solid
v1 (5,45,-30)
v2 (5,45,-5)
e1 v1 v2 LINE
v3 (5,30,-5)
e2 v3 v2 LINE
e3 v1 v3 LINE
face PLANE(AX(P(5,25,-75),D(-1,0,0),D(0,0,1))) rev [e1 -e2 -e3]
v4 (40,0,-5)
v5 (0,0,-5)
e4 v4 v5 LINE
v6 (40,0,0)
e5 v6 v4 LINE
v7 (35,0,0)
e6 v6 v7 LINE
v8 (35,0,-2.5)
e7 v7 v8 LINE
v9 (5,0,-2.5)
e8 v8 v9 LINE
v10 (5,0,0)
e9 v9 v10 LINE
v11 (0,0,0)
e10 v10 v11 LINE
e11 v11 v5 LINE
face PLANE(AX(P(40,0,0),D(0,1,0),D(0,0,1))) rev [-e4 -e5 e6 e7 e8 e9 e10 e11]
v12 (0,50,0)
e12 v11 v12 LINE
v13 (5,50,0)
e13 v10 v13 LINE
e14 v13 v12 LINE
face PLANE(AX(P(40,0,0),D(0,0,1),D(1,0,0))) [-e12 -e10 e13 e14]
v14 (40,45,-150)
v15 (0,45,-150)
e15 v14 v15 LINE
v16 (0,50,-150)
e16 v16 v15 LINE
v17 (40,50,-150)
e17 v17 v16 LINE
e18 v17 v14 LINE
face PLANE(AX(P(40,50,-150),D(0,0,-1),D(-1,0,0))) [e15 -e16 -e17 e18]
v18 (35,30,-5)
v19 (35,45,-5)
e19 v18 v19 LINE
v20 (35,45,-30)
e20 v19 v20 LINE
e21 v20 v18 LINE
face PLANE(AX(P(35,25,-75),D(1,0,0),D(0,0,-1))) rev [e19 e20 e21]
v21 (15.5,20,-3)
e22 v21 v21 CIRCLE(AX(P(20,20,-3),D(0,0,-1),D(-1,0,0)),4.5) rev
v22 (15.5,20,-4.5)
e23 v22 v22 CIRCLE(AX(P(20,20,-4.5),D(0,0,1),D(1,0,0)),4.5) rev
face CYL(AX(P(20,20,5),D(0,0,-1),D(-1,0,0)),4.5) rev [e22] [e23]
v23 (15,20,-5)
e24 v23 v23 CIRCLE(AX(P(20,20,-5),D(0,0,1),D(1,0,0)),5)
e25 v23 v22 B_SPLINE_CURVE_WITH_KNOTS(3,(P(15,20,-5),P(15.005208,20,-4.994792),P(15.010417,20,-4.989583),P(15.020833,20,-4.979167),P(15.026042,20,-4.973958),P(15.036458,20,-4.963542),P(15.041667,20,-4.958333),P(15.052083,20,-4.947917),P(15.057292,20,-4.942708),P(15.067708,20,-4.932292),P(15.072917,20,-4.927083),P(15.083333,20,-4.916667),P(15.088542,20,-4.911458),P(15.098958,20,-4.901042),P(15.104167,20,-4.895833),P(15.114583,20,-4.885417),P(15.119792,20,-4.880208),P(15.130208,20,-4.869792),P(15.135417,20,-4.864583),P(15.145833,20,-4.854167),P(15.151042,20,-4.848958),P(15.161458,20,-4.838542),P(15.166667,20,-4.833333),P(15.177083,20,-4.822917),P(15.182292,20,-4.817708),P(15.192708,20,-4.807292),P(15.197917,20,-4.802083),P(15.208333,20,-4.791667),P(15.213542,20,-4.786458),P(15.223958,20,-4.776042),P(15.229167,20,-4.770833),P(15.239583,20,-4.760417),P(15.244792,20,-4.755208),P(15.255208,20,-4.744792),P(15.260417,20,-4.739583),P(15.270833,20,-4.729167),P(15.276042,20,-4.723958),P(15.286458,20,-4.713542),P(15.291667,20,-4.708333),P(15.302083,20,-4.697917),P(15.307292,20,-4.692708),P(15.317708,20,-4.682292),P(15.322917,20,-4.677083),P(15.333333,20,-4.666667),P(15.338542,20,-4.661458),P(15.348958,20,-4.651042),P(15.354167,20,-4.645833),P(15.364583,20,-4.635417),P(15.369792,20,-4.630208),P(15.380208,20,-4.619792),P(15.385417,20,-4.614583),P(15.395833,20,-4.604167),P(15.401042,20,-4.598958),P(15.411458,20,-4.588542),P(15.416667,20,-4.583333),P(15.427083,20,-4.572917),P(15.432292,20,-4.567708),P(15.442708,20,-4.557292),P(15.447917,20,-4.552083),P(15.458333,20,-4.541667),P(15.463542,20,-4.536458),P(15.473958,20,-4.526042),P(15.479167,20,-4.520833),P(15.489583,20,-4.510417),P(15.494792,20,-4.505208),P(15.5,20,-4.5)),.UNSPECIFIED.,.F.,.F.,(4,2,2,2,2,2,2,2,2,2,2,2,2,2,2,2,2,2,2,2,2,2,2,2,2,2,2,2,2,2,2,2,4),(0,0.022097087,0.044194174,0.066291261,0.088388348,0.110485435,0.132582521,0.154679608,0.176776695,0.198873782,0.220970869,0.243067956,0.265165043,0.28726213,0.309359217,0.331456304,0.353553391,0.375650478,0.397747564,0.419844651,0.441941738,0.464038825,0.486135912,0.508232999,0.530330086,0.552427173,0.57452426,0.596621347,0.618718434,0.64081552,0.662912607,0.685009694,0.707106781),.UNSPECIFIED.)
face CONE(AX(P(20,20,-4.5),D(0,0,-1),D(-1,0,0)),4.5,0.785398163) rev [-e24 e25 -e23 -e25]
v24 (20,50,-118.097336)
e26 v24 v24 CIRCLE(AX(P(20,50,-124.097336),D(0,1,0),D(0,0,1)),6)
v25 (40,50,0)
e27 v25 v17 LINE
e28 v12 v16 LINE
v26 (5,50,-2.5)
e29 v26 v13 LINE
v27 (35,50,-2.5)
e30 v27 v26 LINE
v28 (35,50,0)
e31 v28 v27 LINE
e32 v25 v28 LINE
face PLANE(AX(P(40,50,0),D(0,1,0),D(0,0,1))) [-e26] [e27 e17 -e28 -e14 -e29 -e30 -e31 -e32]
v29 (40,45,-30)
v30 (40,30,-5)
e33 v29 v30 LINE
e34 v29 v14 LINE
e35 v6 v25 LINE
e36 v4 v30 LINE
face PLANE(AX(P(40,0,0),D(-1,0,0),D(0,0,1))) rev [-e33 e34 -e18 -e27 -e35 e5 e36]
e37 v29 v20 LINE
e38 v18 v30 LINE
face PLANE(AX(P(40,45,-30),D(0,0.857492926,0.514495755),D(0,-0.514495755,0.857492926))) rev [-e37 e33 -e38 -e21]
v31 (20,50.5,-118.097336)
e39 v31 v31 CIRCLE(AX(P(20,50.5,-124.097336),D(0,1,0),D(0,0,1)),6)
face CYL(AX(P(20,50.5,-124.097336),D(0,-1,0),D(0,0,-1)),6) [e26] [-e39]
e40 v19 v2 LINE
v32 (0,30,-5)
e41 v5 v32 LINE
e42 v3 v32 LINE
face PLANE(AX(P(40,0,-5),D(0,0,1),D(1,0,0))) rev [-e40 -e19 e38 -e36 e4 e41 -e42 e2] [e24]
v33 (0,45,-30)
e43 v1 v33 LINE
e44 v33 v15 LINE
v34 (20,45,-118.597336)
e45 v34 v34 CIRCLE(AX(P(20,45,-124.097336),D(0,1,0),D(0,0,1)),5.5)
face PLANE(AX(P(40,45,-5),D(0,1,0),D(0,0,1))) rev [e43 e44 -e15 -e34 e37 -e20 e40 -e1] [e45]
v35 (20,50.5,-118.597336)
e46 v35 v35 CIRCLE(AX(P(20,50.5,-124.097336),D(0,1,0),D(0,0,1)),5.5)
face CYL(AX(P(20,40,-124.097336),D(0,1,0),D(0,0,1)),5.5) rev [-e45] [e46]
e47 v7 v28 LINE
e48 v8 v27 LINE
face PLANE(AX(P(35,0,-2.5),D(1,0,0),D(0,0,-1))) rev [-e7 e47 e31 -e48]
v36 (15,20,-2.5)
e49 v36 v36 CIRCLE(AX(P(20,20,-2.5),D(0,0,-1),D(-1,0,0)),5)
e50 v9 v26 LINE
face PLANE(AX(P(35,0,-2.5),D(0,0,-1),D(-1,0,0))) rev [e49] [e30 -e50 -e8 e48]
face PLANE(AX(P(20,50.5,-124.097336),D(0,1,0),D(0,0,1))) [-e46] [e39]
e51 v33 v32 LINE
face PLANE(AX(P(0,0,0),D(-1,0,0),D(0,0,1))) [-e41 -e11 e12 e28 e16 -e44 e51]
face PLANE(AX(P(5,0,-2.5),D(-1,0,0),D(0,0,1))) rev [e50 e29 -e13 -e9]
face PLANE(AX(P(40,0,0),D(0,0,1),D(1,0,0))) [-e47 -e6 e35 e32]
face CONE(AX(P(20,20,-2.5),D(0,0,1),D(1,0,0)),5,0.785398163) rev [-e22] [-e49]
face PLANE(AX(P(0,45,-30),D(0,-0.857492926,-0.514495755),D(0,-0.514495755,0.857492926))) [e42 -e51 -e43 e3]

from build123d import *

# Parameters (mm, degrees)
DODANIE_WYCI_GNI_CIE1_DEPTH = 40
SZKIC2_W                    = 30
SZKIC2_H                    = 2.5
WYTNIJ_WYCI_GNI_CIE1_DEPTH  = 164.095064303
EBRO3_START                 = -5
EBRO3_DEPTH                 = 5
SZKIC4_R                    = 4.5
WYTNIJ_WYCI_GNI_CIE2_DEPTH  = 10
SFAZOWANIE1_SIZE            = 0.5
WYTNIJ_WYCI_GNI_CIE3_DEPTH  = 10
DODANIE_WYCI_GNI_CIE2_START = 0.5
SZKIC6_R                    = 6
SZKIC6_R_2                  = 5.5
DODANIE_WYCI_GNI_CIE2_DEPTH = 0.5


# Read off the part's stored shape, not the designer's step: Żebro3
with BuildPart() as part:
    # Szkic1 → Dodanie-wyciągnięcie1 (new body)
    with BuildSketch(Plane(origin=(0, 0, 0), x_dir=(0, 0, -1), z_dir=(1, 0, 0))):
        Polygon((0, 0), (0, 50), (150, 50), (150, 45), (5, 45), (5, 0), align=None)
    extrude(amount=DODANIE_WYCI_GNI_CIE1_DEPTH)

    # Szkic2 → Wytnij-wyciągnięcie1 (cut, through all)
    with BuildSketch(Plane(origin=(0, 50, 0), x_dir=(1, 0, 0), z_dir=(0, 1, 0))):
        with Locations((20, 1.25)):
            Rectangle(SZKIC2_W, SZKIC2_H)
    extrude(amount=-WYTNIJ_WYCI_GNI_CIE1_DEPTH, mode=Mode.SUBTRACT)

    # Żebro3 outline → Żebro3 (add)
    with BuildSketch(Plane(origin=(40, 0, 0), x_dir=(0, 0, -1), z_dir=(1, 0, 0)).offset(EBRO3_START)):
        Polygon((5, 30), (30, 45), (5, 45), align=None)
    ebro3 = extrude(amount=EBRO3_DEPTH)

    # Lustro1: Żebro3 across plane
    add(ebro3.mirror(Plane(origin=(20, 0, 0), x_dir=(0, 0, 1), z_dir=(1, 0, 0))))

    # Szkic4 → Wytnij-wyciągnięcie2 (cut)
    with BuildSketch(Plane(origin=(0, 0, -5), x_dir=(-1, 0, 0), z_dir=(0, 0, -1))):
        with Locations((-20, 20)):
            Circle(SZKIC4_R)
    extrude(amount=-WYTNIJ_WYCI_GNI_CIE2_DEPTH, mode=Mode.SUBTRACT)

    # Sfazowanie1
    sfazowanie1_edges = [part.edges().sort_by_distance(p)[0] for p in [
        (24.5, 20, -2.5),
        (24.5, 20, -5),
    ]]
    chamfer(sfazowanie1_edges, length=SFAZOWANIE1_SIZE)

    # Szkic5 → Wytnij-wyciągnięcie3 (cut)
    with BuildSketch(Plane(origin=(0, 50, 0), x_dir=(1, 0, 0), z_dir=(0, 1, 0))):
        with BuildLine():
            ThreePointArc((20, 129.597336258), (14.5, 124.097336258), (20, 118.597336258))
            Line((20, 118.597336258), (20, 129.597336258))
        make_face()
        with BuildLine():
            Line((20, 129.597336258), (20, 118.597336258))
            ThreePointArc((20, 118.597336258), (23.889087297, 120.208248962), (25.5, 124.097336258))
            ThreePointArc((25.5, 124.097336258), (23.889087297, 127.986423555), (20, 129.597336258))
        make_face()
    extrude(amount=-WYTNIJ_WYCI_GNI_CIE3_DEPTH, mode=Mode.SUBTRACT)

    # Szkic6 → Dodanie-wyciągnięcie2 (add)
    with BuildSketch(Plane(origin=(0, 50, 0), x_dir=(1, 0, 0), z_dir=(0, 1, 0)).offset(DODANIE_WYCI_GNI_CIE2_START)):
        with Locations(Location((20, 124.097336258, 0), (0, 0, 270))):
            Circle(SZKIC6_R)
        with Locations(Location((20, 124.097336258, 0), (0, 0, 270))):
            Circle(SZKIC6_R_2, mode=Mode.SUBTRACT)
    extrude(amount=-DODANIE_WYCI_GNI_CIE2_DEPTH)


solid = part.part
